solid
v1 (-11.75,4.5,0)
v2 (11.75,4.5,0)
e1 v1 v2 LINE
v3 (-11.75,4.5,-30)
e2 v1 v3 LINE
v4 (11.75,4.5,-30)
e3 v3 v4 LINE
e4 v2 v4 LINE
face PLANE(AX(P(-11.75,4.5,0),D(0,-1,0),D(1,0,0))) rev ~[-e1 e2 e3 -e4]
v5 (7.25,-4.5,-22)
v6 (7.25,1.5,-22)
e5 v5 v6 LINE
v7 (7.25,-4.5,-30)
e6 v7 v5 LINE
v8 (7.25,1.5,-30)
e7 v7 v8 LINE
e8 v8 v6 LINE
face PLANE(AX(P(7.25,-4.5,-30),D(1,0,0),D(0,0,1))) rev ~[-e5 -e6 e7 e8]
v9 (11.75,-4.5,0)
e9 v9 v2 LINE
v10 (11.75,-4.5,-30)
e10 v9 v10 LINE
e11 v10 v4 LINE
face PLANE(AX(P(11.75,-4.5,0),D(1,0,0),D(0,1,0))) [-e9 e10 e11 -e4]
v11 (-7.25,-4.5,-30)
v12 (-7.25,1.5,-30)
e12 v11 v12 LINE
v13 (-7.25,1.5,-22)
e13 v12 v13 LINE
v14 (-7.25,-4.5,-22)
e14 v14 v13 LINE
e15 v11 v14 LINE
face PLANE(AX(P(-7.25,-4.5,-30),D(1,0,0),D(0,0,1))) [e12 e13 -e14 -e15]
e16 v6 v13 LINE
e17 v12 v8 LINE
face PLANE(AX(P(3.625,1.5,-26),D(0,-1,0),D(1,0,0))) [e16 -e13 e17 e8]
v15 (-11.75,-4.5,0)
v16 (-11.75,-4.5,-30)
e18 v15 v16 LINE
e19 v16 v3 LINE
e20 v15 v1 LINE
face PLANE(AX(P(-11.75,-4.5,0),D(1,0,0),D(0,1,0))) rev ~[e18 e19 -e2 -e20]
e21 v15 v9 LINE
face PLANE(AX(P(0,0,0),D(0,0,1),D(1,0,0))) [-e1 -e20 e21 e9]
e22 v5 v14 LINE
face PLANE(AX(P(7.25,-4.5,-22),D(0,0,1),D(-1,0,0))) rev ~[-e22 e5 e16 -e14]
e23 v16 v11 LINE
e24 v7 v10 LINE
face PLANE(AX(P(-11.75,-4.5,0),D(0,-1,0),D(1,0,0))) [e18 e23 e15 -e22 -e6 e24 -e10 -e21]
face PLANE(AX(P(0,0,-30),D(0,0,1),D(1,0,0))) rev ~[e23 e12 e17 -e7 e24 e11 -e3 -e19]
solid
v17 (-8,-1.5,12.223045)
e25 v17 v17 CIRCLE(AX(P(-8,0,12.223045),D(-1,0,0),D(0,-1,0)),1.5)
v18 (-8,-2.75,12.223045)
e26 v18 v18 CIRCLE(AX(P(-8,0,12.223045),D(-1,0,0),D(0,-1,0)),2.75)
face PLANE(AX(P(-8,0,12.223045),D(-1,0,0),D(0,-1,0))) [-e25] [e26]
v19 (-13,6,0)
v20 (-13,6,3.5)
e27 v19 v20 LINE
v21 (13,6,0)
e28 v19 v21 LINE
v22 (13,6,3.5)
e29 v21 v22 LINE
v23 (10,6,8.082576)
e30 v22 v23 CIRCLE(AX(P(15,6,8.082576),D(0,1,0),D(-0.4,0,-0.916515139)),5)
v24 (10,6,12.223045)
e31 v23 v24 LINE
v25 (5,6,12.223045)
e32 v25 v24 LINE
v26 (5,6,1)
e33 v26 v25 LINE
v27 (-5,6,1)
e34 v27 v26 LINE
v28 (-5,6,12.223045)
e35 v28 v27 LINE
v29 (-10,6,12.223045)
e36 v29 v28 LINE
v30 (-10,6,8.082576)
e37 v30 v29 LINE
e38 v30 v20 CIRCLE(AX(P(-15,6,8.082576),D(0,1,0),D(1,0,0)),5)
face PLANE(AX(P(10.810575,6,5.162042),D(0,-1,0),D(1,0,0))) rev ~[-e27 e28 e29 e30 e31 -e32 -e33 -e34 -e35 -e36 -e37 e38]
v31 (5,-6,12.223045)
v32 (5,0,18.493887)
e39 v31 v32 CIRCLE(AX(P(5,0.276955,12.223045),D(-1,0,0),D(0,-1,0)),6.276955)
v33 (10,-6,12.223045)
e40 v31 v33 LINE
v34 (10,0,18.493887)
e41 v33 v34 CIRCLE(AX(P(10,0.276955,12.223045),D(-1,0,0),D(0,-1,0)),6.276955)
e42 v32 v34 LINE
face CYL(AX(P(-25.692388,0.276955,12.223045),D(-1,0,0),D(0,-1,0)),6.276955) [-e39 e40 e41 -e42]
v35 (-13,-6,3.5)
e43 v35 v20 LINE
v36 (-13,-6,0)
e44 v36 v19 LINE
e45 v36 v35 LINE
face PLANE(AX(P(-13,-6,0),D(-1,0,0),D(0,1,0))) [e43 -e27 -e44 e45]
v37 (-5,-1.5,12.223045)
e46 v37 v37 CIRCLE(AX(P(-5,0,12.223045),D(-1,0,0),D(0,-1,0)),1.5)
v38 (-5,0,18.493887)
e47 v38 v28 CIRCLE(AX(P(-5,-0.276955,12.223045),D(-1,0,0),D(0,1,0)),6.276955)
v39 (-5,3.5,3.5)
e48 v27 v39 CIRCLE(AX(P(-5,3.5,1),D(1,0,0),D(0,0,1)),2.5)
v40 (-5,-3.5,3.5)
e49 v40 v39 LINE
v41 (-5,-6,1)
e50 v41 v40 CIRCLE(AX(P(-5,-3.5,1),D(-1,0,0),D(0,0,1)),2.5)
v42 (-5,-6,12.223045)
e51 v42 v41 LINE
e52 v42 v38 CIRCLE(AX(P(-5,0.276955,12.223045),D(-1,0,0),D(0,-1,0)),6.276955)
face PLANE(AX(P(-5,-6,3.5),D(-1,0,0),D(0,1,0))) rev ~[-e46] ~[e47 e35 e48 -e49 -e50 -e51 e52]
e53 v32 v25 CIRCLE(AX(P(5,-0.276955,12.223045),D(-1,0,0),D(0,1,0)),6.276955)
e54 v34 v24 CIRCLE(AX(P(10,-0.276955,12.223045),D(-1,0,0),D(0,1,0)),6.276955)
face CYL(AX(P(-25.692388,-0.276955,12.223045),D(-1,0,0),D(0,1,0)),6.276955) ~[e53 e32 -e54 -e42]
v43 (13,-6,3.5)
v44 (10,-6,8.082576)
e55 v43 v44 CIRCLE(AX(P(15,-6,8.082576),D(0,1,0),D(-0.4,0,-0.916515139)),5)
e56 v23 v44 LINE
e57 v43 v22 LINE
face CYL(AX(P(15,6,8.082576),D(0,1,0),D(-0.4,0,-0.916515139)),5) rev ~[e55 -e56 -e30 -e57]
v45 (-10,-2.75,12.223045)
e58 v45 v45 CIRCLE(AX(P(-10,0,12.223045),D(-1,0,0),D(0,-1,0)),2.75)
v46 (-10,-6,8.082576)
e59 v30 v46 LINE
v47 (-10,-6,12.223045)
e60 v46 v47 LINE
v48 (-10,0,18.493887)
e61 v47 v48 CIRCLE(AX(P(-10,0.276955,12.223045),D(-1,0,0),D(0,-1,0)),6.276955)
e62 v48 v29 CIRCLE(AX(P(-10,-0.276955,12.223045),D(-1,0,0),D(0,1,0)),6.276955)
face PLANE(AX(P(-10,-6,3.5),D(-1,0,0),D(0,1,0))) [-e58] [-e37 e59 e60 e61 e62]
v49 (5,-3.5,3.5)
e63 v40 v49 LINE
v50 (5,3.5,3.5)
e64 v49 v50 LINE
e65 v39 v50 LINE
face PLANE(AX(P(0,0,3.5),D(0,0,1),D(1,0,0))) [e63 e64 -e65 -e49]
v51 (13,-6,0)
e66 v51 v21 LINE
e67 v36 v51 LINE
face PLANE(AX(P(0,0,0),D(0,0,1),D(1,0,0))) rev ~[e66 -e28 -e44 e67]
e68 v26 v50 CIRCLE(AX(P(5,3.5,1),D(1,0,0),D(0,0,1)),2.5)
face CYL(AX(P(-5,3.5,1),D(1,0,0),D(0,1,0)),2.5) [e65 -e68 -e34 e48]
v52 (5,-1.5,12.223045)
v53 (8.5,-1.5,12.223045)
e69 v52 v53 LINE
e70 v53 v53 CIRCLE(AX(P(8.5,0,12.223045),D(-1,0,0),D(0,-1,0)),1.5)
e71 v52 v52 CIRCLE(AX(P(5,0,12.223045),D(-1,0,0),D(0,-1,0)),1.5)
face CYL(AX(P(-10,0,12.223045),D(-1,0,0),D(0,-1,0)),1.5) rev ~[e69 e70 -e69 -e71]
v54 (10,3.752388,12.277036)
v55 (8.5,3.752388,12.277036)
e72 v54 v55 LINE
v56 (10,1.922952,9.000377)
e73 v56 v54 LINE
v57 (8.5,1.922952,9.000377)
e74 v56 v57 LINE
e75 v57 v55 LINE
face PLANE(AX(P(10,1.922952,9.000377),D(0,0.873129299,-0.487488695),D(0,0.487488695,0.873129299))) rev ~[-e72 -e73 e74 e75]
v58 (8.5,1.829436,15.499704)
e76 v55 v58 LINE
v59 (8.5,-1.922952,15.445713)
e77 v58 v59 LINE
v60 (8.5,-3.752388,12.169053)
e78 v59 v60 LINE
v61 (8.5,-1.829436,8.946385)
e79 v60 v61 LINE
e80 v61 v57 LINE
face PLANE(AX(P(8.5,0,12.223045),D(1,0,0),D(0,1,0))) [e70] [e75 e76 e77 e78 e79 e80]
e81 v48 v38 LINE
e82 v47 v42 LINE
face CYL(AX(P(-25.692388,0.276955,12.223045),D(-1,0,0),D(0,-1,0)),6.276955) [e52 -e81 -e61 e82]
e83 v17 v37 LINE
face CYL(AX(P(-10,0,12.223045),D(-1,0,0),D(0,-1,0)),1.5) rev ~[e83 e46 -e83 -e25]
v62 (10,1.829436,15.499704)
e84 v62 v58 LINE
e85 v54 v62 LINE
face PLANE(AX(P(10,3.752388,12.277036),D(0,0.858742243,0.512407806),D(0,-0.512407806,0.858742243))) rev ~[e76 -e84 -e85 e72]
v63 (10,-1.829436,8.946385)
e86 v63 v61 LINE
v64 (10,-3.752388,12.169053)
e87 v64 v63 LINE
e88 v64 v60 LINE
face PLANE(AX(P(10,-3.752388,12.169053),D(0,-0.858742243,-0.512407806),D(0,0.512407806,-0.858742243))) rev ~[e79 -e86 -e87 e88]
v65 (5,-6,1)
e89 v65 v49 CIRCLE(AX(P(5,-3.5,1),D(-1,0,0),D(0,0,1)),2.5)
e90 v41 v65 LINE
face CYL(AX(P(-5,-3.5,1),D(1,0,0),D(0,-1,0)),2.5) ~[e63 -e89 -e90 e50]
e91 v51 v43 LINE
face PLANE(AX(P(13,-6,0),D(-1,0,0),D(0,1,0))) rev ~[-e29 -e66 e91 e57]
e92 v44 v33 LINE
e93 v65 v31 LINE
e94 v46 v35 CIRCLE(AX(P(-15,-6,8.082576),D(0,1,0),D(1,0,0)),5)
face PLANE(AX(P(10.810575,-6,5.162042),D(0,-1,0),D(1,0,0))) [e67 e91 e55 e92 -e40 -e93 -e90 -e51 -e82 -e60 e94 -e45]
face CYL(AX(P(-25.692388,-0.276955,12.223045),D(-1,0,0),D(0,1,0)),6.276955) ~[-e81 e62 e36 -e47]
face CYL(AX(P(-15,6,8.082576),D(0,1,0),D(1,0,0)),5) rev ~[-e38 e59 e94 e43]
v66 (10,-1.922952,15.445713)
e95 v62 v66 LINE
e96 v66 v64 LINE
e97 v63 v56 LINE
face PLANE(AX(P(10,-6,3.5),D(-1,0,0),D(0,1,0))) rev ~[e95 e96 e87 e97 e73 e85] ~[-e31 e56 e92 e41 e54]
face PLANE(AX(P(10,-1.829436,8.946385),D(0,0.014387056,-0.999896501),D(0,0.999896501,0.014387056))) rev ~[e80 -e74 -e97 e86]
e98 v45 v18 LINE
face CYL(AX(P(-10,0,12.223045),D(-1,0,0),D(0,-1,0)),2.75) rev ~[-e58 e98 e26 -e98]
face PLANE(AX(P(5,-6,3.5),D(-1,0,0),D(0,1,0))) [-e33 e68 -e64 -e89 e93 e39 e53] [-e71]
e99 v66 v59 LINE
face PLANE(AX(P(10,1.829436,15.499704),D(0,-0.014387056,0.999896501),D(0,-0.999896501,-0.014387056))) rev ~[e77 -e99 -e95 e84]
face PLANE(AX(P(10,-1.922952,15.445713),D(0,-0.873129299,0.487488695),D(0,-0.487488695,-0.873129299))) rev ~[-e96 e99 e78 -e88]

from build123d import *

# Parameters (mm, degrees)
F0_W         = 23.5
F0_H         = 9
F2_DEPTH     = 30
F3_W         = 26
F3_H         = 12
F3_W_2       = 23.5
F3_H_2       = 9
F4_DEPTH     = 3.5
F5_W         = 5
F5_H         = 12
F7_DEPTH     = 15
F8_T1_DEPTH  = 36.3847763109
F8_T3_DEPTH  = 36.3847763109
F12_DEPTH    = 1.5
F9_R         = 1.5
F14_DEPTH    = 25
F15_W        = 7.25
F15_H        = 8
F17_DEPTH    = 6
F18_T1_DEPTH = 12
F19_R        = 2.5
F9_R_2       = 2.75
F20_DEPTH    = 2


# Not quite as in the source:
# - a fillet or chamfer that OpenCascade refuses, or shapes differently, is made with other operations: its cross-section is extruded or revolved along the edge and cut away or added


with BuildPart() as f2:
    # F0 (on Top) → F2 (new body)
    with BuildSketch(Plane.XY):
        Rectangle(F0_W, F0_H)
    extrude(amount=-F2_DEPTH)

    # F15 (on face) → F17 (cut)
    with BuildSketch(Plane.XZ.offset(4.5)):
        with Locations((3.625, -26)):
            Rectangle(F15_W, F15_H)
        with Locations((-3.625, -26)):
            Rectangle(F15_W, F15_H)
    extrude(amount=-F17_DEPTH, mode=Mode.SUBTRACT)


with BuildPart() as f4:
    # F3 (on face) → F4 (new body)
    with BuildSketch(Plane.XY):
        Rectangle(F3_W, F3_H)
        Rectangle(F3_W_2, F3_H_2, mode=Mode.SUBTRACT)
        Rectangle(F3_W_2, F3_H_2)
    extrude(amount=F4_DEPTH)

    # F5 (on face) → F7 (join)
    with BuildSketch(Plane.XY.offset(3.5)):
        with Locations((-7.5, 0)):
            Rectangle(F5_W, F5_H)
        with Locations((7.5, 0)):
            Rectangle(F5_W, F5_H)
    extrude(amount=F7_DEPTH)

    # F8: fillet of radius 6.2769552622 on 4 edges, made by hand

    # F8_s2 → F8_t1 (cut)
    with BuildSketch(Plane.YZ.offset(-25.6923881554)):
        with BuildLine():
            ThreePointArc((-6, 12.2230447378), (-4.1615223689, 16.6615223689), (0.2769552622, 18.5))
            Line((0.2769552622, 18.5), (-6, 18.5))
            Line((-6, 18.5), (-6, 12.2230447378))
        make_face()
        with BuildLine():
            ThreePointArc((6, 12.2230447378), (4.1615223689, 16.6615223689), (-0.2769552622, 18.5))
            Line((-0.2769552622, 18.5), (6, 18.5))
            Line((6, 18.5), (6, 12.2230447378))
        make_face()
    extrude(amount=F8_T1_DEPTH, mode=Mode.SUBTRACT)

    # F8_s4 → F8_t3 (cut)
    with BuildSketch(Plane.YZ.offset(-10.6923881554)):
        with BuildLine():
            ThreePointArc((6, 12.2230447378), (4.1615223689, 16.6615223689), (-0.2769552622, 18.5))
            Line((-0.2769552622, 18.5), (6, 18.5))
            Line((6, 18.5), (6, 12.2230447378))
        make_face()
        with BuildLine():
            ThreePointArc((-6, 12.2230447378), (-4.1615223689, 16.6615223689), (0.2769552622, 18.5))
            Line((0.2769552622, 18.5), (-6, 18.5))
            Line((-6, 18.5), (-6, 12.2230447378))
        make_face()
    extrude(amount=F8_T3_DEPTH, mode=Mode.SUBTRACT)

    # F10 (on face) → F12 (cut)
    with BuildSketch(Plane.YZ.offset(10)):
        Polygon((1.922952101, 9.0003768135), (3.7523883409, 12.2770361454), (1.8294362399, 15.4997040697), (-1.922952101, 15.4457126622), (-3.7523883409, 12.1690533302), (-1.8294362399, 8.9463854059), align=None)
    extrude(amount=-F12_DEPTH, mode=Mode.SUBTRACT)

    # F9 (on face) → F14 (cut)
    with BuildSketch(Plane(origin=(-10, 0, 0), x_dir=(0, -1, 0), z_dir=(-1, 0, 0))):
        with Locations((0, 12.2230447378)):
            Circle(F9_R)
    extrude(amount=-F14_DEPTH, mode=Mode.SUBTRACT)

    # F18: fillet of radius 5 on 2 edges, made by hand

    # F18_s2 → F18_t1 (join)
    with BuildSketch(Plane.XZ.offset(-6)):
        with BuildLine():
            ThreePointArc((13, 3.5), (10.8166998673, 5.3439629074), (10, 8.082575695))
            Line((10, 8.082575695), (10, 3.5))
            Line((10, 3.5), (13, 3.5))
        make_face()
        with BuildLine():
            ThreePointArc((-10, 8.082575695), (-10.8166998673, 5.3439629074), (-13, 3.5))
            Line((-13, 3.5), (-10, 3.5))
            Line((-10, 3.5), (-10, 8.082575695))
        make_face()
    extrude(amount=F18_T1_DEPTH)

    # F19
    f19_edges = [f4.edges().sort_by_distance(p)[0] for p in [
        (0, 6, 3.5),
        (0, -6, 3.5),
    ]]
    fillet(f19_edges, radius=F19_R)

    # F9 (on face) → F20 (cut)
    with BuildSketch(Plane(origin=(-10, 0, 0), x_dir=(0, -1, 0), z_dir=(-1, 0, 0))):
        with Locations((0, 12.2230447378)):
            Circle(F9_R_2)
        with Locations((0, 12.2230447378)):
            Circle(F9_R, mode=Mode.SUBTRACT)
    extrude(amount=-F20_DEPTH, mode=Mode.SUBTRACT)


solid = Compound([f2.part, f4.part])
